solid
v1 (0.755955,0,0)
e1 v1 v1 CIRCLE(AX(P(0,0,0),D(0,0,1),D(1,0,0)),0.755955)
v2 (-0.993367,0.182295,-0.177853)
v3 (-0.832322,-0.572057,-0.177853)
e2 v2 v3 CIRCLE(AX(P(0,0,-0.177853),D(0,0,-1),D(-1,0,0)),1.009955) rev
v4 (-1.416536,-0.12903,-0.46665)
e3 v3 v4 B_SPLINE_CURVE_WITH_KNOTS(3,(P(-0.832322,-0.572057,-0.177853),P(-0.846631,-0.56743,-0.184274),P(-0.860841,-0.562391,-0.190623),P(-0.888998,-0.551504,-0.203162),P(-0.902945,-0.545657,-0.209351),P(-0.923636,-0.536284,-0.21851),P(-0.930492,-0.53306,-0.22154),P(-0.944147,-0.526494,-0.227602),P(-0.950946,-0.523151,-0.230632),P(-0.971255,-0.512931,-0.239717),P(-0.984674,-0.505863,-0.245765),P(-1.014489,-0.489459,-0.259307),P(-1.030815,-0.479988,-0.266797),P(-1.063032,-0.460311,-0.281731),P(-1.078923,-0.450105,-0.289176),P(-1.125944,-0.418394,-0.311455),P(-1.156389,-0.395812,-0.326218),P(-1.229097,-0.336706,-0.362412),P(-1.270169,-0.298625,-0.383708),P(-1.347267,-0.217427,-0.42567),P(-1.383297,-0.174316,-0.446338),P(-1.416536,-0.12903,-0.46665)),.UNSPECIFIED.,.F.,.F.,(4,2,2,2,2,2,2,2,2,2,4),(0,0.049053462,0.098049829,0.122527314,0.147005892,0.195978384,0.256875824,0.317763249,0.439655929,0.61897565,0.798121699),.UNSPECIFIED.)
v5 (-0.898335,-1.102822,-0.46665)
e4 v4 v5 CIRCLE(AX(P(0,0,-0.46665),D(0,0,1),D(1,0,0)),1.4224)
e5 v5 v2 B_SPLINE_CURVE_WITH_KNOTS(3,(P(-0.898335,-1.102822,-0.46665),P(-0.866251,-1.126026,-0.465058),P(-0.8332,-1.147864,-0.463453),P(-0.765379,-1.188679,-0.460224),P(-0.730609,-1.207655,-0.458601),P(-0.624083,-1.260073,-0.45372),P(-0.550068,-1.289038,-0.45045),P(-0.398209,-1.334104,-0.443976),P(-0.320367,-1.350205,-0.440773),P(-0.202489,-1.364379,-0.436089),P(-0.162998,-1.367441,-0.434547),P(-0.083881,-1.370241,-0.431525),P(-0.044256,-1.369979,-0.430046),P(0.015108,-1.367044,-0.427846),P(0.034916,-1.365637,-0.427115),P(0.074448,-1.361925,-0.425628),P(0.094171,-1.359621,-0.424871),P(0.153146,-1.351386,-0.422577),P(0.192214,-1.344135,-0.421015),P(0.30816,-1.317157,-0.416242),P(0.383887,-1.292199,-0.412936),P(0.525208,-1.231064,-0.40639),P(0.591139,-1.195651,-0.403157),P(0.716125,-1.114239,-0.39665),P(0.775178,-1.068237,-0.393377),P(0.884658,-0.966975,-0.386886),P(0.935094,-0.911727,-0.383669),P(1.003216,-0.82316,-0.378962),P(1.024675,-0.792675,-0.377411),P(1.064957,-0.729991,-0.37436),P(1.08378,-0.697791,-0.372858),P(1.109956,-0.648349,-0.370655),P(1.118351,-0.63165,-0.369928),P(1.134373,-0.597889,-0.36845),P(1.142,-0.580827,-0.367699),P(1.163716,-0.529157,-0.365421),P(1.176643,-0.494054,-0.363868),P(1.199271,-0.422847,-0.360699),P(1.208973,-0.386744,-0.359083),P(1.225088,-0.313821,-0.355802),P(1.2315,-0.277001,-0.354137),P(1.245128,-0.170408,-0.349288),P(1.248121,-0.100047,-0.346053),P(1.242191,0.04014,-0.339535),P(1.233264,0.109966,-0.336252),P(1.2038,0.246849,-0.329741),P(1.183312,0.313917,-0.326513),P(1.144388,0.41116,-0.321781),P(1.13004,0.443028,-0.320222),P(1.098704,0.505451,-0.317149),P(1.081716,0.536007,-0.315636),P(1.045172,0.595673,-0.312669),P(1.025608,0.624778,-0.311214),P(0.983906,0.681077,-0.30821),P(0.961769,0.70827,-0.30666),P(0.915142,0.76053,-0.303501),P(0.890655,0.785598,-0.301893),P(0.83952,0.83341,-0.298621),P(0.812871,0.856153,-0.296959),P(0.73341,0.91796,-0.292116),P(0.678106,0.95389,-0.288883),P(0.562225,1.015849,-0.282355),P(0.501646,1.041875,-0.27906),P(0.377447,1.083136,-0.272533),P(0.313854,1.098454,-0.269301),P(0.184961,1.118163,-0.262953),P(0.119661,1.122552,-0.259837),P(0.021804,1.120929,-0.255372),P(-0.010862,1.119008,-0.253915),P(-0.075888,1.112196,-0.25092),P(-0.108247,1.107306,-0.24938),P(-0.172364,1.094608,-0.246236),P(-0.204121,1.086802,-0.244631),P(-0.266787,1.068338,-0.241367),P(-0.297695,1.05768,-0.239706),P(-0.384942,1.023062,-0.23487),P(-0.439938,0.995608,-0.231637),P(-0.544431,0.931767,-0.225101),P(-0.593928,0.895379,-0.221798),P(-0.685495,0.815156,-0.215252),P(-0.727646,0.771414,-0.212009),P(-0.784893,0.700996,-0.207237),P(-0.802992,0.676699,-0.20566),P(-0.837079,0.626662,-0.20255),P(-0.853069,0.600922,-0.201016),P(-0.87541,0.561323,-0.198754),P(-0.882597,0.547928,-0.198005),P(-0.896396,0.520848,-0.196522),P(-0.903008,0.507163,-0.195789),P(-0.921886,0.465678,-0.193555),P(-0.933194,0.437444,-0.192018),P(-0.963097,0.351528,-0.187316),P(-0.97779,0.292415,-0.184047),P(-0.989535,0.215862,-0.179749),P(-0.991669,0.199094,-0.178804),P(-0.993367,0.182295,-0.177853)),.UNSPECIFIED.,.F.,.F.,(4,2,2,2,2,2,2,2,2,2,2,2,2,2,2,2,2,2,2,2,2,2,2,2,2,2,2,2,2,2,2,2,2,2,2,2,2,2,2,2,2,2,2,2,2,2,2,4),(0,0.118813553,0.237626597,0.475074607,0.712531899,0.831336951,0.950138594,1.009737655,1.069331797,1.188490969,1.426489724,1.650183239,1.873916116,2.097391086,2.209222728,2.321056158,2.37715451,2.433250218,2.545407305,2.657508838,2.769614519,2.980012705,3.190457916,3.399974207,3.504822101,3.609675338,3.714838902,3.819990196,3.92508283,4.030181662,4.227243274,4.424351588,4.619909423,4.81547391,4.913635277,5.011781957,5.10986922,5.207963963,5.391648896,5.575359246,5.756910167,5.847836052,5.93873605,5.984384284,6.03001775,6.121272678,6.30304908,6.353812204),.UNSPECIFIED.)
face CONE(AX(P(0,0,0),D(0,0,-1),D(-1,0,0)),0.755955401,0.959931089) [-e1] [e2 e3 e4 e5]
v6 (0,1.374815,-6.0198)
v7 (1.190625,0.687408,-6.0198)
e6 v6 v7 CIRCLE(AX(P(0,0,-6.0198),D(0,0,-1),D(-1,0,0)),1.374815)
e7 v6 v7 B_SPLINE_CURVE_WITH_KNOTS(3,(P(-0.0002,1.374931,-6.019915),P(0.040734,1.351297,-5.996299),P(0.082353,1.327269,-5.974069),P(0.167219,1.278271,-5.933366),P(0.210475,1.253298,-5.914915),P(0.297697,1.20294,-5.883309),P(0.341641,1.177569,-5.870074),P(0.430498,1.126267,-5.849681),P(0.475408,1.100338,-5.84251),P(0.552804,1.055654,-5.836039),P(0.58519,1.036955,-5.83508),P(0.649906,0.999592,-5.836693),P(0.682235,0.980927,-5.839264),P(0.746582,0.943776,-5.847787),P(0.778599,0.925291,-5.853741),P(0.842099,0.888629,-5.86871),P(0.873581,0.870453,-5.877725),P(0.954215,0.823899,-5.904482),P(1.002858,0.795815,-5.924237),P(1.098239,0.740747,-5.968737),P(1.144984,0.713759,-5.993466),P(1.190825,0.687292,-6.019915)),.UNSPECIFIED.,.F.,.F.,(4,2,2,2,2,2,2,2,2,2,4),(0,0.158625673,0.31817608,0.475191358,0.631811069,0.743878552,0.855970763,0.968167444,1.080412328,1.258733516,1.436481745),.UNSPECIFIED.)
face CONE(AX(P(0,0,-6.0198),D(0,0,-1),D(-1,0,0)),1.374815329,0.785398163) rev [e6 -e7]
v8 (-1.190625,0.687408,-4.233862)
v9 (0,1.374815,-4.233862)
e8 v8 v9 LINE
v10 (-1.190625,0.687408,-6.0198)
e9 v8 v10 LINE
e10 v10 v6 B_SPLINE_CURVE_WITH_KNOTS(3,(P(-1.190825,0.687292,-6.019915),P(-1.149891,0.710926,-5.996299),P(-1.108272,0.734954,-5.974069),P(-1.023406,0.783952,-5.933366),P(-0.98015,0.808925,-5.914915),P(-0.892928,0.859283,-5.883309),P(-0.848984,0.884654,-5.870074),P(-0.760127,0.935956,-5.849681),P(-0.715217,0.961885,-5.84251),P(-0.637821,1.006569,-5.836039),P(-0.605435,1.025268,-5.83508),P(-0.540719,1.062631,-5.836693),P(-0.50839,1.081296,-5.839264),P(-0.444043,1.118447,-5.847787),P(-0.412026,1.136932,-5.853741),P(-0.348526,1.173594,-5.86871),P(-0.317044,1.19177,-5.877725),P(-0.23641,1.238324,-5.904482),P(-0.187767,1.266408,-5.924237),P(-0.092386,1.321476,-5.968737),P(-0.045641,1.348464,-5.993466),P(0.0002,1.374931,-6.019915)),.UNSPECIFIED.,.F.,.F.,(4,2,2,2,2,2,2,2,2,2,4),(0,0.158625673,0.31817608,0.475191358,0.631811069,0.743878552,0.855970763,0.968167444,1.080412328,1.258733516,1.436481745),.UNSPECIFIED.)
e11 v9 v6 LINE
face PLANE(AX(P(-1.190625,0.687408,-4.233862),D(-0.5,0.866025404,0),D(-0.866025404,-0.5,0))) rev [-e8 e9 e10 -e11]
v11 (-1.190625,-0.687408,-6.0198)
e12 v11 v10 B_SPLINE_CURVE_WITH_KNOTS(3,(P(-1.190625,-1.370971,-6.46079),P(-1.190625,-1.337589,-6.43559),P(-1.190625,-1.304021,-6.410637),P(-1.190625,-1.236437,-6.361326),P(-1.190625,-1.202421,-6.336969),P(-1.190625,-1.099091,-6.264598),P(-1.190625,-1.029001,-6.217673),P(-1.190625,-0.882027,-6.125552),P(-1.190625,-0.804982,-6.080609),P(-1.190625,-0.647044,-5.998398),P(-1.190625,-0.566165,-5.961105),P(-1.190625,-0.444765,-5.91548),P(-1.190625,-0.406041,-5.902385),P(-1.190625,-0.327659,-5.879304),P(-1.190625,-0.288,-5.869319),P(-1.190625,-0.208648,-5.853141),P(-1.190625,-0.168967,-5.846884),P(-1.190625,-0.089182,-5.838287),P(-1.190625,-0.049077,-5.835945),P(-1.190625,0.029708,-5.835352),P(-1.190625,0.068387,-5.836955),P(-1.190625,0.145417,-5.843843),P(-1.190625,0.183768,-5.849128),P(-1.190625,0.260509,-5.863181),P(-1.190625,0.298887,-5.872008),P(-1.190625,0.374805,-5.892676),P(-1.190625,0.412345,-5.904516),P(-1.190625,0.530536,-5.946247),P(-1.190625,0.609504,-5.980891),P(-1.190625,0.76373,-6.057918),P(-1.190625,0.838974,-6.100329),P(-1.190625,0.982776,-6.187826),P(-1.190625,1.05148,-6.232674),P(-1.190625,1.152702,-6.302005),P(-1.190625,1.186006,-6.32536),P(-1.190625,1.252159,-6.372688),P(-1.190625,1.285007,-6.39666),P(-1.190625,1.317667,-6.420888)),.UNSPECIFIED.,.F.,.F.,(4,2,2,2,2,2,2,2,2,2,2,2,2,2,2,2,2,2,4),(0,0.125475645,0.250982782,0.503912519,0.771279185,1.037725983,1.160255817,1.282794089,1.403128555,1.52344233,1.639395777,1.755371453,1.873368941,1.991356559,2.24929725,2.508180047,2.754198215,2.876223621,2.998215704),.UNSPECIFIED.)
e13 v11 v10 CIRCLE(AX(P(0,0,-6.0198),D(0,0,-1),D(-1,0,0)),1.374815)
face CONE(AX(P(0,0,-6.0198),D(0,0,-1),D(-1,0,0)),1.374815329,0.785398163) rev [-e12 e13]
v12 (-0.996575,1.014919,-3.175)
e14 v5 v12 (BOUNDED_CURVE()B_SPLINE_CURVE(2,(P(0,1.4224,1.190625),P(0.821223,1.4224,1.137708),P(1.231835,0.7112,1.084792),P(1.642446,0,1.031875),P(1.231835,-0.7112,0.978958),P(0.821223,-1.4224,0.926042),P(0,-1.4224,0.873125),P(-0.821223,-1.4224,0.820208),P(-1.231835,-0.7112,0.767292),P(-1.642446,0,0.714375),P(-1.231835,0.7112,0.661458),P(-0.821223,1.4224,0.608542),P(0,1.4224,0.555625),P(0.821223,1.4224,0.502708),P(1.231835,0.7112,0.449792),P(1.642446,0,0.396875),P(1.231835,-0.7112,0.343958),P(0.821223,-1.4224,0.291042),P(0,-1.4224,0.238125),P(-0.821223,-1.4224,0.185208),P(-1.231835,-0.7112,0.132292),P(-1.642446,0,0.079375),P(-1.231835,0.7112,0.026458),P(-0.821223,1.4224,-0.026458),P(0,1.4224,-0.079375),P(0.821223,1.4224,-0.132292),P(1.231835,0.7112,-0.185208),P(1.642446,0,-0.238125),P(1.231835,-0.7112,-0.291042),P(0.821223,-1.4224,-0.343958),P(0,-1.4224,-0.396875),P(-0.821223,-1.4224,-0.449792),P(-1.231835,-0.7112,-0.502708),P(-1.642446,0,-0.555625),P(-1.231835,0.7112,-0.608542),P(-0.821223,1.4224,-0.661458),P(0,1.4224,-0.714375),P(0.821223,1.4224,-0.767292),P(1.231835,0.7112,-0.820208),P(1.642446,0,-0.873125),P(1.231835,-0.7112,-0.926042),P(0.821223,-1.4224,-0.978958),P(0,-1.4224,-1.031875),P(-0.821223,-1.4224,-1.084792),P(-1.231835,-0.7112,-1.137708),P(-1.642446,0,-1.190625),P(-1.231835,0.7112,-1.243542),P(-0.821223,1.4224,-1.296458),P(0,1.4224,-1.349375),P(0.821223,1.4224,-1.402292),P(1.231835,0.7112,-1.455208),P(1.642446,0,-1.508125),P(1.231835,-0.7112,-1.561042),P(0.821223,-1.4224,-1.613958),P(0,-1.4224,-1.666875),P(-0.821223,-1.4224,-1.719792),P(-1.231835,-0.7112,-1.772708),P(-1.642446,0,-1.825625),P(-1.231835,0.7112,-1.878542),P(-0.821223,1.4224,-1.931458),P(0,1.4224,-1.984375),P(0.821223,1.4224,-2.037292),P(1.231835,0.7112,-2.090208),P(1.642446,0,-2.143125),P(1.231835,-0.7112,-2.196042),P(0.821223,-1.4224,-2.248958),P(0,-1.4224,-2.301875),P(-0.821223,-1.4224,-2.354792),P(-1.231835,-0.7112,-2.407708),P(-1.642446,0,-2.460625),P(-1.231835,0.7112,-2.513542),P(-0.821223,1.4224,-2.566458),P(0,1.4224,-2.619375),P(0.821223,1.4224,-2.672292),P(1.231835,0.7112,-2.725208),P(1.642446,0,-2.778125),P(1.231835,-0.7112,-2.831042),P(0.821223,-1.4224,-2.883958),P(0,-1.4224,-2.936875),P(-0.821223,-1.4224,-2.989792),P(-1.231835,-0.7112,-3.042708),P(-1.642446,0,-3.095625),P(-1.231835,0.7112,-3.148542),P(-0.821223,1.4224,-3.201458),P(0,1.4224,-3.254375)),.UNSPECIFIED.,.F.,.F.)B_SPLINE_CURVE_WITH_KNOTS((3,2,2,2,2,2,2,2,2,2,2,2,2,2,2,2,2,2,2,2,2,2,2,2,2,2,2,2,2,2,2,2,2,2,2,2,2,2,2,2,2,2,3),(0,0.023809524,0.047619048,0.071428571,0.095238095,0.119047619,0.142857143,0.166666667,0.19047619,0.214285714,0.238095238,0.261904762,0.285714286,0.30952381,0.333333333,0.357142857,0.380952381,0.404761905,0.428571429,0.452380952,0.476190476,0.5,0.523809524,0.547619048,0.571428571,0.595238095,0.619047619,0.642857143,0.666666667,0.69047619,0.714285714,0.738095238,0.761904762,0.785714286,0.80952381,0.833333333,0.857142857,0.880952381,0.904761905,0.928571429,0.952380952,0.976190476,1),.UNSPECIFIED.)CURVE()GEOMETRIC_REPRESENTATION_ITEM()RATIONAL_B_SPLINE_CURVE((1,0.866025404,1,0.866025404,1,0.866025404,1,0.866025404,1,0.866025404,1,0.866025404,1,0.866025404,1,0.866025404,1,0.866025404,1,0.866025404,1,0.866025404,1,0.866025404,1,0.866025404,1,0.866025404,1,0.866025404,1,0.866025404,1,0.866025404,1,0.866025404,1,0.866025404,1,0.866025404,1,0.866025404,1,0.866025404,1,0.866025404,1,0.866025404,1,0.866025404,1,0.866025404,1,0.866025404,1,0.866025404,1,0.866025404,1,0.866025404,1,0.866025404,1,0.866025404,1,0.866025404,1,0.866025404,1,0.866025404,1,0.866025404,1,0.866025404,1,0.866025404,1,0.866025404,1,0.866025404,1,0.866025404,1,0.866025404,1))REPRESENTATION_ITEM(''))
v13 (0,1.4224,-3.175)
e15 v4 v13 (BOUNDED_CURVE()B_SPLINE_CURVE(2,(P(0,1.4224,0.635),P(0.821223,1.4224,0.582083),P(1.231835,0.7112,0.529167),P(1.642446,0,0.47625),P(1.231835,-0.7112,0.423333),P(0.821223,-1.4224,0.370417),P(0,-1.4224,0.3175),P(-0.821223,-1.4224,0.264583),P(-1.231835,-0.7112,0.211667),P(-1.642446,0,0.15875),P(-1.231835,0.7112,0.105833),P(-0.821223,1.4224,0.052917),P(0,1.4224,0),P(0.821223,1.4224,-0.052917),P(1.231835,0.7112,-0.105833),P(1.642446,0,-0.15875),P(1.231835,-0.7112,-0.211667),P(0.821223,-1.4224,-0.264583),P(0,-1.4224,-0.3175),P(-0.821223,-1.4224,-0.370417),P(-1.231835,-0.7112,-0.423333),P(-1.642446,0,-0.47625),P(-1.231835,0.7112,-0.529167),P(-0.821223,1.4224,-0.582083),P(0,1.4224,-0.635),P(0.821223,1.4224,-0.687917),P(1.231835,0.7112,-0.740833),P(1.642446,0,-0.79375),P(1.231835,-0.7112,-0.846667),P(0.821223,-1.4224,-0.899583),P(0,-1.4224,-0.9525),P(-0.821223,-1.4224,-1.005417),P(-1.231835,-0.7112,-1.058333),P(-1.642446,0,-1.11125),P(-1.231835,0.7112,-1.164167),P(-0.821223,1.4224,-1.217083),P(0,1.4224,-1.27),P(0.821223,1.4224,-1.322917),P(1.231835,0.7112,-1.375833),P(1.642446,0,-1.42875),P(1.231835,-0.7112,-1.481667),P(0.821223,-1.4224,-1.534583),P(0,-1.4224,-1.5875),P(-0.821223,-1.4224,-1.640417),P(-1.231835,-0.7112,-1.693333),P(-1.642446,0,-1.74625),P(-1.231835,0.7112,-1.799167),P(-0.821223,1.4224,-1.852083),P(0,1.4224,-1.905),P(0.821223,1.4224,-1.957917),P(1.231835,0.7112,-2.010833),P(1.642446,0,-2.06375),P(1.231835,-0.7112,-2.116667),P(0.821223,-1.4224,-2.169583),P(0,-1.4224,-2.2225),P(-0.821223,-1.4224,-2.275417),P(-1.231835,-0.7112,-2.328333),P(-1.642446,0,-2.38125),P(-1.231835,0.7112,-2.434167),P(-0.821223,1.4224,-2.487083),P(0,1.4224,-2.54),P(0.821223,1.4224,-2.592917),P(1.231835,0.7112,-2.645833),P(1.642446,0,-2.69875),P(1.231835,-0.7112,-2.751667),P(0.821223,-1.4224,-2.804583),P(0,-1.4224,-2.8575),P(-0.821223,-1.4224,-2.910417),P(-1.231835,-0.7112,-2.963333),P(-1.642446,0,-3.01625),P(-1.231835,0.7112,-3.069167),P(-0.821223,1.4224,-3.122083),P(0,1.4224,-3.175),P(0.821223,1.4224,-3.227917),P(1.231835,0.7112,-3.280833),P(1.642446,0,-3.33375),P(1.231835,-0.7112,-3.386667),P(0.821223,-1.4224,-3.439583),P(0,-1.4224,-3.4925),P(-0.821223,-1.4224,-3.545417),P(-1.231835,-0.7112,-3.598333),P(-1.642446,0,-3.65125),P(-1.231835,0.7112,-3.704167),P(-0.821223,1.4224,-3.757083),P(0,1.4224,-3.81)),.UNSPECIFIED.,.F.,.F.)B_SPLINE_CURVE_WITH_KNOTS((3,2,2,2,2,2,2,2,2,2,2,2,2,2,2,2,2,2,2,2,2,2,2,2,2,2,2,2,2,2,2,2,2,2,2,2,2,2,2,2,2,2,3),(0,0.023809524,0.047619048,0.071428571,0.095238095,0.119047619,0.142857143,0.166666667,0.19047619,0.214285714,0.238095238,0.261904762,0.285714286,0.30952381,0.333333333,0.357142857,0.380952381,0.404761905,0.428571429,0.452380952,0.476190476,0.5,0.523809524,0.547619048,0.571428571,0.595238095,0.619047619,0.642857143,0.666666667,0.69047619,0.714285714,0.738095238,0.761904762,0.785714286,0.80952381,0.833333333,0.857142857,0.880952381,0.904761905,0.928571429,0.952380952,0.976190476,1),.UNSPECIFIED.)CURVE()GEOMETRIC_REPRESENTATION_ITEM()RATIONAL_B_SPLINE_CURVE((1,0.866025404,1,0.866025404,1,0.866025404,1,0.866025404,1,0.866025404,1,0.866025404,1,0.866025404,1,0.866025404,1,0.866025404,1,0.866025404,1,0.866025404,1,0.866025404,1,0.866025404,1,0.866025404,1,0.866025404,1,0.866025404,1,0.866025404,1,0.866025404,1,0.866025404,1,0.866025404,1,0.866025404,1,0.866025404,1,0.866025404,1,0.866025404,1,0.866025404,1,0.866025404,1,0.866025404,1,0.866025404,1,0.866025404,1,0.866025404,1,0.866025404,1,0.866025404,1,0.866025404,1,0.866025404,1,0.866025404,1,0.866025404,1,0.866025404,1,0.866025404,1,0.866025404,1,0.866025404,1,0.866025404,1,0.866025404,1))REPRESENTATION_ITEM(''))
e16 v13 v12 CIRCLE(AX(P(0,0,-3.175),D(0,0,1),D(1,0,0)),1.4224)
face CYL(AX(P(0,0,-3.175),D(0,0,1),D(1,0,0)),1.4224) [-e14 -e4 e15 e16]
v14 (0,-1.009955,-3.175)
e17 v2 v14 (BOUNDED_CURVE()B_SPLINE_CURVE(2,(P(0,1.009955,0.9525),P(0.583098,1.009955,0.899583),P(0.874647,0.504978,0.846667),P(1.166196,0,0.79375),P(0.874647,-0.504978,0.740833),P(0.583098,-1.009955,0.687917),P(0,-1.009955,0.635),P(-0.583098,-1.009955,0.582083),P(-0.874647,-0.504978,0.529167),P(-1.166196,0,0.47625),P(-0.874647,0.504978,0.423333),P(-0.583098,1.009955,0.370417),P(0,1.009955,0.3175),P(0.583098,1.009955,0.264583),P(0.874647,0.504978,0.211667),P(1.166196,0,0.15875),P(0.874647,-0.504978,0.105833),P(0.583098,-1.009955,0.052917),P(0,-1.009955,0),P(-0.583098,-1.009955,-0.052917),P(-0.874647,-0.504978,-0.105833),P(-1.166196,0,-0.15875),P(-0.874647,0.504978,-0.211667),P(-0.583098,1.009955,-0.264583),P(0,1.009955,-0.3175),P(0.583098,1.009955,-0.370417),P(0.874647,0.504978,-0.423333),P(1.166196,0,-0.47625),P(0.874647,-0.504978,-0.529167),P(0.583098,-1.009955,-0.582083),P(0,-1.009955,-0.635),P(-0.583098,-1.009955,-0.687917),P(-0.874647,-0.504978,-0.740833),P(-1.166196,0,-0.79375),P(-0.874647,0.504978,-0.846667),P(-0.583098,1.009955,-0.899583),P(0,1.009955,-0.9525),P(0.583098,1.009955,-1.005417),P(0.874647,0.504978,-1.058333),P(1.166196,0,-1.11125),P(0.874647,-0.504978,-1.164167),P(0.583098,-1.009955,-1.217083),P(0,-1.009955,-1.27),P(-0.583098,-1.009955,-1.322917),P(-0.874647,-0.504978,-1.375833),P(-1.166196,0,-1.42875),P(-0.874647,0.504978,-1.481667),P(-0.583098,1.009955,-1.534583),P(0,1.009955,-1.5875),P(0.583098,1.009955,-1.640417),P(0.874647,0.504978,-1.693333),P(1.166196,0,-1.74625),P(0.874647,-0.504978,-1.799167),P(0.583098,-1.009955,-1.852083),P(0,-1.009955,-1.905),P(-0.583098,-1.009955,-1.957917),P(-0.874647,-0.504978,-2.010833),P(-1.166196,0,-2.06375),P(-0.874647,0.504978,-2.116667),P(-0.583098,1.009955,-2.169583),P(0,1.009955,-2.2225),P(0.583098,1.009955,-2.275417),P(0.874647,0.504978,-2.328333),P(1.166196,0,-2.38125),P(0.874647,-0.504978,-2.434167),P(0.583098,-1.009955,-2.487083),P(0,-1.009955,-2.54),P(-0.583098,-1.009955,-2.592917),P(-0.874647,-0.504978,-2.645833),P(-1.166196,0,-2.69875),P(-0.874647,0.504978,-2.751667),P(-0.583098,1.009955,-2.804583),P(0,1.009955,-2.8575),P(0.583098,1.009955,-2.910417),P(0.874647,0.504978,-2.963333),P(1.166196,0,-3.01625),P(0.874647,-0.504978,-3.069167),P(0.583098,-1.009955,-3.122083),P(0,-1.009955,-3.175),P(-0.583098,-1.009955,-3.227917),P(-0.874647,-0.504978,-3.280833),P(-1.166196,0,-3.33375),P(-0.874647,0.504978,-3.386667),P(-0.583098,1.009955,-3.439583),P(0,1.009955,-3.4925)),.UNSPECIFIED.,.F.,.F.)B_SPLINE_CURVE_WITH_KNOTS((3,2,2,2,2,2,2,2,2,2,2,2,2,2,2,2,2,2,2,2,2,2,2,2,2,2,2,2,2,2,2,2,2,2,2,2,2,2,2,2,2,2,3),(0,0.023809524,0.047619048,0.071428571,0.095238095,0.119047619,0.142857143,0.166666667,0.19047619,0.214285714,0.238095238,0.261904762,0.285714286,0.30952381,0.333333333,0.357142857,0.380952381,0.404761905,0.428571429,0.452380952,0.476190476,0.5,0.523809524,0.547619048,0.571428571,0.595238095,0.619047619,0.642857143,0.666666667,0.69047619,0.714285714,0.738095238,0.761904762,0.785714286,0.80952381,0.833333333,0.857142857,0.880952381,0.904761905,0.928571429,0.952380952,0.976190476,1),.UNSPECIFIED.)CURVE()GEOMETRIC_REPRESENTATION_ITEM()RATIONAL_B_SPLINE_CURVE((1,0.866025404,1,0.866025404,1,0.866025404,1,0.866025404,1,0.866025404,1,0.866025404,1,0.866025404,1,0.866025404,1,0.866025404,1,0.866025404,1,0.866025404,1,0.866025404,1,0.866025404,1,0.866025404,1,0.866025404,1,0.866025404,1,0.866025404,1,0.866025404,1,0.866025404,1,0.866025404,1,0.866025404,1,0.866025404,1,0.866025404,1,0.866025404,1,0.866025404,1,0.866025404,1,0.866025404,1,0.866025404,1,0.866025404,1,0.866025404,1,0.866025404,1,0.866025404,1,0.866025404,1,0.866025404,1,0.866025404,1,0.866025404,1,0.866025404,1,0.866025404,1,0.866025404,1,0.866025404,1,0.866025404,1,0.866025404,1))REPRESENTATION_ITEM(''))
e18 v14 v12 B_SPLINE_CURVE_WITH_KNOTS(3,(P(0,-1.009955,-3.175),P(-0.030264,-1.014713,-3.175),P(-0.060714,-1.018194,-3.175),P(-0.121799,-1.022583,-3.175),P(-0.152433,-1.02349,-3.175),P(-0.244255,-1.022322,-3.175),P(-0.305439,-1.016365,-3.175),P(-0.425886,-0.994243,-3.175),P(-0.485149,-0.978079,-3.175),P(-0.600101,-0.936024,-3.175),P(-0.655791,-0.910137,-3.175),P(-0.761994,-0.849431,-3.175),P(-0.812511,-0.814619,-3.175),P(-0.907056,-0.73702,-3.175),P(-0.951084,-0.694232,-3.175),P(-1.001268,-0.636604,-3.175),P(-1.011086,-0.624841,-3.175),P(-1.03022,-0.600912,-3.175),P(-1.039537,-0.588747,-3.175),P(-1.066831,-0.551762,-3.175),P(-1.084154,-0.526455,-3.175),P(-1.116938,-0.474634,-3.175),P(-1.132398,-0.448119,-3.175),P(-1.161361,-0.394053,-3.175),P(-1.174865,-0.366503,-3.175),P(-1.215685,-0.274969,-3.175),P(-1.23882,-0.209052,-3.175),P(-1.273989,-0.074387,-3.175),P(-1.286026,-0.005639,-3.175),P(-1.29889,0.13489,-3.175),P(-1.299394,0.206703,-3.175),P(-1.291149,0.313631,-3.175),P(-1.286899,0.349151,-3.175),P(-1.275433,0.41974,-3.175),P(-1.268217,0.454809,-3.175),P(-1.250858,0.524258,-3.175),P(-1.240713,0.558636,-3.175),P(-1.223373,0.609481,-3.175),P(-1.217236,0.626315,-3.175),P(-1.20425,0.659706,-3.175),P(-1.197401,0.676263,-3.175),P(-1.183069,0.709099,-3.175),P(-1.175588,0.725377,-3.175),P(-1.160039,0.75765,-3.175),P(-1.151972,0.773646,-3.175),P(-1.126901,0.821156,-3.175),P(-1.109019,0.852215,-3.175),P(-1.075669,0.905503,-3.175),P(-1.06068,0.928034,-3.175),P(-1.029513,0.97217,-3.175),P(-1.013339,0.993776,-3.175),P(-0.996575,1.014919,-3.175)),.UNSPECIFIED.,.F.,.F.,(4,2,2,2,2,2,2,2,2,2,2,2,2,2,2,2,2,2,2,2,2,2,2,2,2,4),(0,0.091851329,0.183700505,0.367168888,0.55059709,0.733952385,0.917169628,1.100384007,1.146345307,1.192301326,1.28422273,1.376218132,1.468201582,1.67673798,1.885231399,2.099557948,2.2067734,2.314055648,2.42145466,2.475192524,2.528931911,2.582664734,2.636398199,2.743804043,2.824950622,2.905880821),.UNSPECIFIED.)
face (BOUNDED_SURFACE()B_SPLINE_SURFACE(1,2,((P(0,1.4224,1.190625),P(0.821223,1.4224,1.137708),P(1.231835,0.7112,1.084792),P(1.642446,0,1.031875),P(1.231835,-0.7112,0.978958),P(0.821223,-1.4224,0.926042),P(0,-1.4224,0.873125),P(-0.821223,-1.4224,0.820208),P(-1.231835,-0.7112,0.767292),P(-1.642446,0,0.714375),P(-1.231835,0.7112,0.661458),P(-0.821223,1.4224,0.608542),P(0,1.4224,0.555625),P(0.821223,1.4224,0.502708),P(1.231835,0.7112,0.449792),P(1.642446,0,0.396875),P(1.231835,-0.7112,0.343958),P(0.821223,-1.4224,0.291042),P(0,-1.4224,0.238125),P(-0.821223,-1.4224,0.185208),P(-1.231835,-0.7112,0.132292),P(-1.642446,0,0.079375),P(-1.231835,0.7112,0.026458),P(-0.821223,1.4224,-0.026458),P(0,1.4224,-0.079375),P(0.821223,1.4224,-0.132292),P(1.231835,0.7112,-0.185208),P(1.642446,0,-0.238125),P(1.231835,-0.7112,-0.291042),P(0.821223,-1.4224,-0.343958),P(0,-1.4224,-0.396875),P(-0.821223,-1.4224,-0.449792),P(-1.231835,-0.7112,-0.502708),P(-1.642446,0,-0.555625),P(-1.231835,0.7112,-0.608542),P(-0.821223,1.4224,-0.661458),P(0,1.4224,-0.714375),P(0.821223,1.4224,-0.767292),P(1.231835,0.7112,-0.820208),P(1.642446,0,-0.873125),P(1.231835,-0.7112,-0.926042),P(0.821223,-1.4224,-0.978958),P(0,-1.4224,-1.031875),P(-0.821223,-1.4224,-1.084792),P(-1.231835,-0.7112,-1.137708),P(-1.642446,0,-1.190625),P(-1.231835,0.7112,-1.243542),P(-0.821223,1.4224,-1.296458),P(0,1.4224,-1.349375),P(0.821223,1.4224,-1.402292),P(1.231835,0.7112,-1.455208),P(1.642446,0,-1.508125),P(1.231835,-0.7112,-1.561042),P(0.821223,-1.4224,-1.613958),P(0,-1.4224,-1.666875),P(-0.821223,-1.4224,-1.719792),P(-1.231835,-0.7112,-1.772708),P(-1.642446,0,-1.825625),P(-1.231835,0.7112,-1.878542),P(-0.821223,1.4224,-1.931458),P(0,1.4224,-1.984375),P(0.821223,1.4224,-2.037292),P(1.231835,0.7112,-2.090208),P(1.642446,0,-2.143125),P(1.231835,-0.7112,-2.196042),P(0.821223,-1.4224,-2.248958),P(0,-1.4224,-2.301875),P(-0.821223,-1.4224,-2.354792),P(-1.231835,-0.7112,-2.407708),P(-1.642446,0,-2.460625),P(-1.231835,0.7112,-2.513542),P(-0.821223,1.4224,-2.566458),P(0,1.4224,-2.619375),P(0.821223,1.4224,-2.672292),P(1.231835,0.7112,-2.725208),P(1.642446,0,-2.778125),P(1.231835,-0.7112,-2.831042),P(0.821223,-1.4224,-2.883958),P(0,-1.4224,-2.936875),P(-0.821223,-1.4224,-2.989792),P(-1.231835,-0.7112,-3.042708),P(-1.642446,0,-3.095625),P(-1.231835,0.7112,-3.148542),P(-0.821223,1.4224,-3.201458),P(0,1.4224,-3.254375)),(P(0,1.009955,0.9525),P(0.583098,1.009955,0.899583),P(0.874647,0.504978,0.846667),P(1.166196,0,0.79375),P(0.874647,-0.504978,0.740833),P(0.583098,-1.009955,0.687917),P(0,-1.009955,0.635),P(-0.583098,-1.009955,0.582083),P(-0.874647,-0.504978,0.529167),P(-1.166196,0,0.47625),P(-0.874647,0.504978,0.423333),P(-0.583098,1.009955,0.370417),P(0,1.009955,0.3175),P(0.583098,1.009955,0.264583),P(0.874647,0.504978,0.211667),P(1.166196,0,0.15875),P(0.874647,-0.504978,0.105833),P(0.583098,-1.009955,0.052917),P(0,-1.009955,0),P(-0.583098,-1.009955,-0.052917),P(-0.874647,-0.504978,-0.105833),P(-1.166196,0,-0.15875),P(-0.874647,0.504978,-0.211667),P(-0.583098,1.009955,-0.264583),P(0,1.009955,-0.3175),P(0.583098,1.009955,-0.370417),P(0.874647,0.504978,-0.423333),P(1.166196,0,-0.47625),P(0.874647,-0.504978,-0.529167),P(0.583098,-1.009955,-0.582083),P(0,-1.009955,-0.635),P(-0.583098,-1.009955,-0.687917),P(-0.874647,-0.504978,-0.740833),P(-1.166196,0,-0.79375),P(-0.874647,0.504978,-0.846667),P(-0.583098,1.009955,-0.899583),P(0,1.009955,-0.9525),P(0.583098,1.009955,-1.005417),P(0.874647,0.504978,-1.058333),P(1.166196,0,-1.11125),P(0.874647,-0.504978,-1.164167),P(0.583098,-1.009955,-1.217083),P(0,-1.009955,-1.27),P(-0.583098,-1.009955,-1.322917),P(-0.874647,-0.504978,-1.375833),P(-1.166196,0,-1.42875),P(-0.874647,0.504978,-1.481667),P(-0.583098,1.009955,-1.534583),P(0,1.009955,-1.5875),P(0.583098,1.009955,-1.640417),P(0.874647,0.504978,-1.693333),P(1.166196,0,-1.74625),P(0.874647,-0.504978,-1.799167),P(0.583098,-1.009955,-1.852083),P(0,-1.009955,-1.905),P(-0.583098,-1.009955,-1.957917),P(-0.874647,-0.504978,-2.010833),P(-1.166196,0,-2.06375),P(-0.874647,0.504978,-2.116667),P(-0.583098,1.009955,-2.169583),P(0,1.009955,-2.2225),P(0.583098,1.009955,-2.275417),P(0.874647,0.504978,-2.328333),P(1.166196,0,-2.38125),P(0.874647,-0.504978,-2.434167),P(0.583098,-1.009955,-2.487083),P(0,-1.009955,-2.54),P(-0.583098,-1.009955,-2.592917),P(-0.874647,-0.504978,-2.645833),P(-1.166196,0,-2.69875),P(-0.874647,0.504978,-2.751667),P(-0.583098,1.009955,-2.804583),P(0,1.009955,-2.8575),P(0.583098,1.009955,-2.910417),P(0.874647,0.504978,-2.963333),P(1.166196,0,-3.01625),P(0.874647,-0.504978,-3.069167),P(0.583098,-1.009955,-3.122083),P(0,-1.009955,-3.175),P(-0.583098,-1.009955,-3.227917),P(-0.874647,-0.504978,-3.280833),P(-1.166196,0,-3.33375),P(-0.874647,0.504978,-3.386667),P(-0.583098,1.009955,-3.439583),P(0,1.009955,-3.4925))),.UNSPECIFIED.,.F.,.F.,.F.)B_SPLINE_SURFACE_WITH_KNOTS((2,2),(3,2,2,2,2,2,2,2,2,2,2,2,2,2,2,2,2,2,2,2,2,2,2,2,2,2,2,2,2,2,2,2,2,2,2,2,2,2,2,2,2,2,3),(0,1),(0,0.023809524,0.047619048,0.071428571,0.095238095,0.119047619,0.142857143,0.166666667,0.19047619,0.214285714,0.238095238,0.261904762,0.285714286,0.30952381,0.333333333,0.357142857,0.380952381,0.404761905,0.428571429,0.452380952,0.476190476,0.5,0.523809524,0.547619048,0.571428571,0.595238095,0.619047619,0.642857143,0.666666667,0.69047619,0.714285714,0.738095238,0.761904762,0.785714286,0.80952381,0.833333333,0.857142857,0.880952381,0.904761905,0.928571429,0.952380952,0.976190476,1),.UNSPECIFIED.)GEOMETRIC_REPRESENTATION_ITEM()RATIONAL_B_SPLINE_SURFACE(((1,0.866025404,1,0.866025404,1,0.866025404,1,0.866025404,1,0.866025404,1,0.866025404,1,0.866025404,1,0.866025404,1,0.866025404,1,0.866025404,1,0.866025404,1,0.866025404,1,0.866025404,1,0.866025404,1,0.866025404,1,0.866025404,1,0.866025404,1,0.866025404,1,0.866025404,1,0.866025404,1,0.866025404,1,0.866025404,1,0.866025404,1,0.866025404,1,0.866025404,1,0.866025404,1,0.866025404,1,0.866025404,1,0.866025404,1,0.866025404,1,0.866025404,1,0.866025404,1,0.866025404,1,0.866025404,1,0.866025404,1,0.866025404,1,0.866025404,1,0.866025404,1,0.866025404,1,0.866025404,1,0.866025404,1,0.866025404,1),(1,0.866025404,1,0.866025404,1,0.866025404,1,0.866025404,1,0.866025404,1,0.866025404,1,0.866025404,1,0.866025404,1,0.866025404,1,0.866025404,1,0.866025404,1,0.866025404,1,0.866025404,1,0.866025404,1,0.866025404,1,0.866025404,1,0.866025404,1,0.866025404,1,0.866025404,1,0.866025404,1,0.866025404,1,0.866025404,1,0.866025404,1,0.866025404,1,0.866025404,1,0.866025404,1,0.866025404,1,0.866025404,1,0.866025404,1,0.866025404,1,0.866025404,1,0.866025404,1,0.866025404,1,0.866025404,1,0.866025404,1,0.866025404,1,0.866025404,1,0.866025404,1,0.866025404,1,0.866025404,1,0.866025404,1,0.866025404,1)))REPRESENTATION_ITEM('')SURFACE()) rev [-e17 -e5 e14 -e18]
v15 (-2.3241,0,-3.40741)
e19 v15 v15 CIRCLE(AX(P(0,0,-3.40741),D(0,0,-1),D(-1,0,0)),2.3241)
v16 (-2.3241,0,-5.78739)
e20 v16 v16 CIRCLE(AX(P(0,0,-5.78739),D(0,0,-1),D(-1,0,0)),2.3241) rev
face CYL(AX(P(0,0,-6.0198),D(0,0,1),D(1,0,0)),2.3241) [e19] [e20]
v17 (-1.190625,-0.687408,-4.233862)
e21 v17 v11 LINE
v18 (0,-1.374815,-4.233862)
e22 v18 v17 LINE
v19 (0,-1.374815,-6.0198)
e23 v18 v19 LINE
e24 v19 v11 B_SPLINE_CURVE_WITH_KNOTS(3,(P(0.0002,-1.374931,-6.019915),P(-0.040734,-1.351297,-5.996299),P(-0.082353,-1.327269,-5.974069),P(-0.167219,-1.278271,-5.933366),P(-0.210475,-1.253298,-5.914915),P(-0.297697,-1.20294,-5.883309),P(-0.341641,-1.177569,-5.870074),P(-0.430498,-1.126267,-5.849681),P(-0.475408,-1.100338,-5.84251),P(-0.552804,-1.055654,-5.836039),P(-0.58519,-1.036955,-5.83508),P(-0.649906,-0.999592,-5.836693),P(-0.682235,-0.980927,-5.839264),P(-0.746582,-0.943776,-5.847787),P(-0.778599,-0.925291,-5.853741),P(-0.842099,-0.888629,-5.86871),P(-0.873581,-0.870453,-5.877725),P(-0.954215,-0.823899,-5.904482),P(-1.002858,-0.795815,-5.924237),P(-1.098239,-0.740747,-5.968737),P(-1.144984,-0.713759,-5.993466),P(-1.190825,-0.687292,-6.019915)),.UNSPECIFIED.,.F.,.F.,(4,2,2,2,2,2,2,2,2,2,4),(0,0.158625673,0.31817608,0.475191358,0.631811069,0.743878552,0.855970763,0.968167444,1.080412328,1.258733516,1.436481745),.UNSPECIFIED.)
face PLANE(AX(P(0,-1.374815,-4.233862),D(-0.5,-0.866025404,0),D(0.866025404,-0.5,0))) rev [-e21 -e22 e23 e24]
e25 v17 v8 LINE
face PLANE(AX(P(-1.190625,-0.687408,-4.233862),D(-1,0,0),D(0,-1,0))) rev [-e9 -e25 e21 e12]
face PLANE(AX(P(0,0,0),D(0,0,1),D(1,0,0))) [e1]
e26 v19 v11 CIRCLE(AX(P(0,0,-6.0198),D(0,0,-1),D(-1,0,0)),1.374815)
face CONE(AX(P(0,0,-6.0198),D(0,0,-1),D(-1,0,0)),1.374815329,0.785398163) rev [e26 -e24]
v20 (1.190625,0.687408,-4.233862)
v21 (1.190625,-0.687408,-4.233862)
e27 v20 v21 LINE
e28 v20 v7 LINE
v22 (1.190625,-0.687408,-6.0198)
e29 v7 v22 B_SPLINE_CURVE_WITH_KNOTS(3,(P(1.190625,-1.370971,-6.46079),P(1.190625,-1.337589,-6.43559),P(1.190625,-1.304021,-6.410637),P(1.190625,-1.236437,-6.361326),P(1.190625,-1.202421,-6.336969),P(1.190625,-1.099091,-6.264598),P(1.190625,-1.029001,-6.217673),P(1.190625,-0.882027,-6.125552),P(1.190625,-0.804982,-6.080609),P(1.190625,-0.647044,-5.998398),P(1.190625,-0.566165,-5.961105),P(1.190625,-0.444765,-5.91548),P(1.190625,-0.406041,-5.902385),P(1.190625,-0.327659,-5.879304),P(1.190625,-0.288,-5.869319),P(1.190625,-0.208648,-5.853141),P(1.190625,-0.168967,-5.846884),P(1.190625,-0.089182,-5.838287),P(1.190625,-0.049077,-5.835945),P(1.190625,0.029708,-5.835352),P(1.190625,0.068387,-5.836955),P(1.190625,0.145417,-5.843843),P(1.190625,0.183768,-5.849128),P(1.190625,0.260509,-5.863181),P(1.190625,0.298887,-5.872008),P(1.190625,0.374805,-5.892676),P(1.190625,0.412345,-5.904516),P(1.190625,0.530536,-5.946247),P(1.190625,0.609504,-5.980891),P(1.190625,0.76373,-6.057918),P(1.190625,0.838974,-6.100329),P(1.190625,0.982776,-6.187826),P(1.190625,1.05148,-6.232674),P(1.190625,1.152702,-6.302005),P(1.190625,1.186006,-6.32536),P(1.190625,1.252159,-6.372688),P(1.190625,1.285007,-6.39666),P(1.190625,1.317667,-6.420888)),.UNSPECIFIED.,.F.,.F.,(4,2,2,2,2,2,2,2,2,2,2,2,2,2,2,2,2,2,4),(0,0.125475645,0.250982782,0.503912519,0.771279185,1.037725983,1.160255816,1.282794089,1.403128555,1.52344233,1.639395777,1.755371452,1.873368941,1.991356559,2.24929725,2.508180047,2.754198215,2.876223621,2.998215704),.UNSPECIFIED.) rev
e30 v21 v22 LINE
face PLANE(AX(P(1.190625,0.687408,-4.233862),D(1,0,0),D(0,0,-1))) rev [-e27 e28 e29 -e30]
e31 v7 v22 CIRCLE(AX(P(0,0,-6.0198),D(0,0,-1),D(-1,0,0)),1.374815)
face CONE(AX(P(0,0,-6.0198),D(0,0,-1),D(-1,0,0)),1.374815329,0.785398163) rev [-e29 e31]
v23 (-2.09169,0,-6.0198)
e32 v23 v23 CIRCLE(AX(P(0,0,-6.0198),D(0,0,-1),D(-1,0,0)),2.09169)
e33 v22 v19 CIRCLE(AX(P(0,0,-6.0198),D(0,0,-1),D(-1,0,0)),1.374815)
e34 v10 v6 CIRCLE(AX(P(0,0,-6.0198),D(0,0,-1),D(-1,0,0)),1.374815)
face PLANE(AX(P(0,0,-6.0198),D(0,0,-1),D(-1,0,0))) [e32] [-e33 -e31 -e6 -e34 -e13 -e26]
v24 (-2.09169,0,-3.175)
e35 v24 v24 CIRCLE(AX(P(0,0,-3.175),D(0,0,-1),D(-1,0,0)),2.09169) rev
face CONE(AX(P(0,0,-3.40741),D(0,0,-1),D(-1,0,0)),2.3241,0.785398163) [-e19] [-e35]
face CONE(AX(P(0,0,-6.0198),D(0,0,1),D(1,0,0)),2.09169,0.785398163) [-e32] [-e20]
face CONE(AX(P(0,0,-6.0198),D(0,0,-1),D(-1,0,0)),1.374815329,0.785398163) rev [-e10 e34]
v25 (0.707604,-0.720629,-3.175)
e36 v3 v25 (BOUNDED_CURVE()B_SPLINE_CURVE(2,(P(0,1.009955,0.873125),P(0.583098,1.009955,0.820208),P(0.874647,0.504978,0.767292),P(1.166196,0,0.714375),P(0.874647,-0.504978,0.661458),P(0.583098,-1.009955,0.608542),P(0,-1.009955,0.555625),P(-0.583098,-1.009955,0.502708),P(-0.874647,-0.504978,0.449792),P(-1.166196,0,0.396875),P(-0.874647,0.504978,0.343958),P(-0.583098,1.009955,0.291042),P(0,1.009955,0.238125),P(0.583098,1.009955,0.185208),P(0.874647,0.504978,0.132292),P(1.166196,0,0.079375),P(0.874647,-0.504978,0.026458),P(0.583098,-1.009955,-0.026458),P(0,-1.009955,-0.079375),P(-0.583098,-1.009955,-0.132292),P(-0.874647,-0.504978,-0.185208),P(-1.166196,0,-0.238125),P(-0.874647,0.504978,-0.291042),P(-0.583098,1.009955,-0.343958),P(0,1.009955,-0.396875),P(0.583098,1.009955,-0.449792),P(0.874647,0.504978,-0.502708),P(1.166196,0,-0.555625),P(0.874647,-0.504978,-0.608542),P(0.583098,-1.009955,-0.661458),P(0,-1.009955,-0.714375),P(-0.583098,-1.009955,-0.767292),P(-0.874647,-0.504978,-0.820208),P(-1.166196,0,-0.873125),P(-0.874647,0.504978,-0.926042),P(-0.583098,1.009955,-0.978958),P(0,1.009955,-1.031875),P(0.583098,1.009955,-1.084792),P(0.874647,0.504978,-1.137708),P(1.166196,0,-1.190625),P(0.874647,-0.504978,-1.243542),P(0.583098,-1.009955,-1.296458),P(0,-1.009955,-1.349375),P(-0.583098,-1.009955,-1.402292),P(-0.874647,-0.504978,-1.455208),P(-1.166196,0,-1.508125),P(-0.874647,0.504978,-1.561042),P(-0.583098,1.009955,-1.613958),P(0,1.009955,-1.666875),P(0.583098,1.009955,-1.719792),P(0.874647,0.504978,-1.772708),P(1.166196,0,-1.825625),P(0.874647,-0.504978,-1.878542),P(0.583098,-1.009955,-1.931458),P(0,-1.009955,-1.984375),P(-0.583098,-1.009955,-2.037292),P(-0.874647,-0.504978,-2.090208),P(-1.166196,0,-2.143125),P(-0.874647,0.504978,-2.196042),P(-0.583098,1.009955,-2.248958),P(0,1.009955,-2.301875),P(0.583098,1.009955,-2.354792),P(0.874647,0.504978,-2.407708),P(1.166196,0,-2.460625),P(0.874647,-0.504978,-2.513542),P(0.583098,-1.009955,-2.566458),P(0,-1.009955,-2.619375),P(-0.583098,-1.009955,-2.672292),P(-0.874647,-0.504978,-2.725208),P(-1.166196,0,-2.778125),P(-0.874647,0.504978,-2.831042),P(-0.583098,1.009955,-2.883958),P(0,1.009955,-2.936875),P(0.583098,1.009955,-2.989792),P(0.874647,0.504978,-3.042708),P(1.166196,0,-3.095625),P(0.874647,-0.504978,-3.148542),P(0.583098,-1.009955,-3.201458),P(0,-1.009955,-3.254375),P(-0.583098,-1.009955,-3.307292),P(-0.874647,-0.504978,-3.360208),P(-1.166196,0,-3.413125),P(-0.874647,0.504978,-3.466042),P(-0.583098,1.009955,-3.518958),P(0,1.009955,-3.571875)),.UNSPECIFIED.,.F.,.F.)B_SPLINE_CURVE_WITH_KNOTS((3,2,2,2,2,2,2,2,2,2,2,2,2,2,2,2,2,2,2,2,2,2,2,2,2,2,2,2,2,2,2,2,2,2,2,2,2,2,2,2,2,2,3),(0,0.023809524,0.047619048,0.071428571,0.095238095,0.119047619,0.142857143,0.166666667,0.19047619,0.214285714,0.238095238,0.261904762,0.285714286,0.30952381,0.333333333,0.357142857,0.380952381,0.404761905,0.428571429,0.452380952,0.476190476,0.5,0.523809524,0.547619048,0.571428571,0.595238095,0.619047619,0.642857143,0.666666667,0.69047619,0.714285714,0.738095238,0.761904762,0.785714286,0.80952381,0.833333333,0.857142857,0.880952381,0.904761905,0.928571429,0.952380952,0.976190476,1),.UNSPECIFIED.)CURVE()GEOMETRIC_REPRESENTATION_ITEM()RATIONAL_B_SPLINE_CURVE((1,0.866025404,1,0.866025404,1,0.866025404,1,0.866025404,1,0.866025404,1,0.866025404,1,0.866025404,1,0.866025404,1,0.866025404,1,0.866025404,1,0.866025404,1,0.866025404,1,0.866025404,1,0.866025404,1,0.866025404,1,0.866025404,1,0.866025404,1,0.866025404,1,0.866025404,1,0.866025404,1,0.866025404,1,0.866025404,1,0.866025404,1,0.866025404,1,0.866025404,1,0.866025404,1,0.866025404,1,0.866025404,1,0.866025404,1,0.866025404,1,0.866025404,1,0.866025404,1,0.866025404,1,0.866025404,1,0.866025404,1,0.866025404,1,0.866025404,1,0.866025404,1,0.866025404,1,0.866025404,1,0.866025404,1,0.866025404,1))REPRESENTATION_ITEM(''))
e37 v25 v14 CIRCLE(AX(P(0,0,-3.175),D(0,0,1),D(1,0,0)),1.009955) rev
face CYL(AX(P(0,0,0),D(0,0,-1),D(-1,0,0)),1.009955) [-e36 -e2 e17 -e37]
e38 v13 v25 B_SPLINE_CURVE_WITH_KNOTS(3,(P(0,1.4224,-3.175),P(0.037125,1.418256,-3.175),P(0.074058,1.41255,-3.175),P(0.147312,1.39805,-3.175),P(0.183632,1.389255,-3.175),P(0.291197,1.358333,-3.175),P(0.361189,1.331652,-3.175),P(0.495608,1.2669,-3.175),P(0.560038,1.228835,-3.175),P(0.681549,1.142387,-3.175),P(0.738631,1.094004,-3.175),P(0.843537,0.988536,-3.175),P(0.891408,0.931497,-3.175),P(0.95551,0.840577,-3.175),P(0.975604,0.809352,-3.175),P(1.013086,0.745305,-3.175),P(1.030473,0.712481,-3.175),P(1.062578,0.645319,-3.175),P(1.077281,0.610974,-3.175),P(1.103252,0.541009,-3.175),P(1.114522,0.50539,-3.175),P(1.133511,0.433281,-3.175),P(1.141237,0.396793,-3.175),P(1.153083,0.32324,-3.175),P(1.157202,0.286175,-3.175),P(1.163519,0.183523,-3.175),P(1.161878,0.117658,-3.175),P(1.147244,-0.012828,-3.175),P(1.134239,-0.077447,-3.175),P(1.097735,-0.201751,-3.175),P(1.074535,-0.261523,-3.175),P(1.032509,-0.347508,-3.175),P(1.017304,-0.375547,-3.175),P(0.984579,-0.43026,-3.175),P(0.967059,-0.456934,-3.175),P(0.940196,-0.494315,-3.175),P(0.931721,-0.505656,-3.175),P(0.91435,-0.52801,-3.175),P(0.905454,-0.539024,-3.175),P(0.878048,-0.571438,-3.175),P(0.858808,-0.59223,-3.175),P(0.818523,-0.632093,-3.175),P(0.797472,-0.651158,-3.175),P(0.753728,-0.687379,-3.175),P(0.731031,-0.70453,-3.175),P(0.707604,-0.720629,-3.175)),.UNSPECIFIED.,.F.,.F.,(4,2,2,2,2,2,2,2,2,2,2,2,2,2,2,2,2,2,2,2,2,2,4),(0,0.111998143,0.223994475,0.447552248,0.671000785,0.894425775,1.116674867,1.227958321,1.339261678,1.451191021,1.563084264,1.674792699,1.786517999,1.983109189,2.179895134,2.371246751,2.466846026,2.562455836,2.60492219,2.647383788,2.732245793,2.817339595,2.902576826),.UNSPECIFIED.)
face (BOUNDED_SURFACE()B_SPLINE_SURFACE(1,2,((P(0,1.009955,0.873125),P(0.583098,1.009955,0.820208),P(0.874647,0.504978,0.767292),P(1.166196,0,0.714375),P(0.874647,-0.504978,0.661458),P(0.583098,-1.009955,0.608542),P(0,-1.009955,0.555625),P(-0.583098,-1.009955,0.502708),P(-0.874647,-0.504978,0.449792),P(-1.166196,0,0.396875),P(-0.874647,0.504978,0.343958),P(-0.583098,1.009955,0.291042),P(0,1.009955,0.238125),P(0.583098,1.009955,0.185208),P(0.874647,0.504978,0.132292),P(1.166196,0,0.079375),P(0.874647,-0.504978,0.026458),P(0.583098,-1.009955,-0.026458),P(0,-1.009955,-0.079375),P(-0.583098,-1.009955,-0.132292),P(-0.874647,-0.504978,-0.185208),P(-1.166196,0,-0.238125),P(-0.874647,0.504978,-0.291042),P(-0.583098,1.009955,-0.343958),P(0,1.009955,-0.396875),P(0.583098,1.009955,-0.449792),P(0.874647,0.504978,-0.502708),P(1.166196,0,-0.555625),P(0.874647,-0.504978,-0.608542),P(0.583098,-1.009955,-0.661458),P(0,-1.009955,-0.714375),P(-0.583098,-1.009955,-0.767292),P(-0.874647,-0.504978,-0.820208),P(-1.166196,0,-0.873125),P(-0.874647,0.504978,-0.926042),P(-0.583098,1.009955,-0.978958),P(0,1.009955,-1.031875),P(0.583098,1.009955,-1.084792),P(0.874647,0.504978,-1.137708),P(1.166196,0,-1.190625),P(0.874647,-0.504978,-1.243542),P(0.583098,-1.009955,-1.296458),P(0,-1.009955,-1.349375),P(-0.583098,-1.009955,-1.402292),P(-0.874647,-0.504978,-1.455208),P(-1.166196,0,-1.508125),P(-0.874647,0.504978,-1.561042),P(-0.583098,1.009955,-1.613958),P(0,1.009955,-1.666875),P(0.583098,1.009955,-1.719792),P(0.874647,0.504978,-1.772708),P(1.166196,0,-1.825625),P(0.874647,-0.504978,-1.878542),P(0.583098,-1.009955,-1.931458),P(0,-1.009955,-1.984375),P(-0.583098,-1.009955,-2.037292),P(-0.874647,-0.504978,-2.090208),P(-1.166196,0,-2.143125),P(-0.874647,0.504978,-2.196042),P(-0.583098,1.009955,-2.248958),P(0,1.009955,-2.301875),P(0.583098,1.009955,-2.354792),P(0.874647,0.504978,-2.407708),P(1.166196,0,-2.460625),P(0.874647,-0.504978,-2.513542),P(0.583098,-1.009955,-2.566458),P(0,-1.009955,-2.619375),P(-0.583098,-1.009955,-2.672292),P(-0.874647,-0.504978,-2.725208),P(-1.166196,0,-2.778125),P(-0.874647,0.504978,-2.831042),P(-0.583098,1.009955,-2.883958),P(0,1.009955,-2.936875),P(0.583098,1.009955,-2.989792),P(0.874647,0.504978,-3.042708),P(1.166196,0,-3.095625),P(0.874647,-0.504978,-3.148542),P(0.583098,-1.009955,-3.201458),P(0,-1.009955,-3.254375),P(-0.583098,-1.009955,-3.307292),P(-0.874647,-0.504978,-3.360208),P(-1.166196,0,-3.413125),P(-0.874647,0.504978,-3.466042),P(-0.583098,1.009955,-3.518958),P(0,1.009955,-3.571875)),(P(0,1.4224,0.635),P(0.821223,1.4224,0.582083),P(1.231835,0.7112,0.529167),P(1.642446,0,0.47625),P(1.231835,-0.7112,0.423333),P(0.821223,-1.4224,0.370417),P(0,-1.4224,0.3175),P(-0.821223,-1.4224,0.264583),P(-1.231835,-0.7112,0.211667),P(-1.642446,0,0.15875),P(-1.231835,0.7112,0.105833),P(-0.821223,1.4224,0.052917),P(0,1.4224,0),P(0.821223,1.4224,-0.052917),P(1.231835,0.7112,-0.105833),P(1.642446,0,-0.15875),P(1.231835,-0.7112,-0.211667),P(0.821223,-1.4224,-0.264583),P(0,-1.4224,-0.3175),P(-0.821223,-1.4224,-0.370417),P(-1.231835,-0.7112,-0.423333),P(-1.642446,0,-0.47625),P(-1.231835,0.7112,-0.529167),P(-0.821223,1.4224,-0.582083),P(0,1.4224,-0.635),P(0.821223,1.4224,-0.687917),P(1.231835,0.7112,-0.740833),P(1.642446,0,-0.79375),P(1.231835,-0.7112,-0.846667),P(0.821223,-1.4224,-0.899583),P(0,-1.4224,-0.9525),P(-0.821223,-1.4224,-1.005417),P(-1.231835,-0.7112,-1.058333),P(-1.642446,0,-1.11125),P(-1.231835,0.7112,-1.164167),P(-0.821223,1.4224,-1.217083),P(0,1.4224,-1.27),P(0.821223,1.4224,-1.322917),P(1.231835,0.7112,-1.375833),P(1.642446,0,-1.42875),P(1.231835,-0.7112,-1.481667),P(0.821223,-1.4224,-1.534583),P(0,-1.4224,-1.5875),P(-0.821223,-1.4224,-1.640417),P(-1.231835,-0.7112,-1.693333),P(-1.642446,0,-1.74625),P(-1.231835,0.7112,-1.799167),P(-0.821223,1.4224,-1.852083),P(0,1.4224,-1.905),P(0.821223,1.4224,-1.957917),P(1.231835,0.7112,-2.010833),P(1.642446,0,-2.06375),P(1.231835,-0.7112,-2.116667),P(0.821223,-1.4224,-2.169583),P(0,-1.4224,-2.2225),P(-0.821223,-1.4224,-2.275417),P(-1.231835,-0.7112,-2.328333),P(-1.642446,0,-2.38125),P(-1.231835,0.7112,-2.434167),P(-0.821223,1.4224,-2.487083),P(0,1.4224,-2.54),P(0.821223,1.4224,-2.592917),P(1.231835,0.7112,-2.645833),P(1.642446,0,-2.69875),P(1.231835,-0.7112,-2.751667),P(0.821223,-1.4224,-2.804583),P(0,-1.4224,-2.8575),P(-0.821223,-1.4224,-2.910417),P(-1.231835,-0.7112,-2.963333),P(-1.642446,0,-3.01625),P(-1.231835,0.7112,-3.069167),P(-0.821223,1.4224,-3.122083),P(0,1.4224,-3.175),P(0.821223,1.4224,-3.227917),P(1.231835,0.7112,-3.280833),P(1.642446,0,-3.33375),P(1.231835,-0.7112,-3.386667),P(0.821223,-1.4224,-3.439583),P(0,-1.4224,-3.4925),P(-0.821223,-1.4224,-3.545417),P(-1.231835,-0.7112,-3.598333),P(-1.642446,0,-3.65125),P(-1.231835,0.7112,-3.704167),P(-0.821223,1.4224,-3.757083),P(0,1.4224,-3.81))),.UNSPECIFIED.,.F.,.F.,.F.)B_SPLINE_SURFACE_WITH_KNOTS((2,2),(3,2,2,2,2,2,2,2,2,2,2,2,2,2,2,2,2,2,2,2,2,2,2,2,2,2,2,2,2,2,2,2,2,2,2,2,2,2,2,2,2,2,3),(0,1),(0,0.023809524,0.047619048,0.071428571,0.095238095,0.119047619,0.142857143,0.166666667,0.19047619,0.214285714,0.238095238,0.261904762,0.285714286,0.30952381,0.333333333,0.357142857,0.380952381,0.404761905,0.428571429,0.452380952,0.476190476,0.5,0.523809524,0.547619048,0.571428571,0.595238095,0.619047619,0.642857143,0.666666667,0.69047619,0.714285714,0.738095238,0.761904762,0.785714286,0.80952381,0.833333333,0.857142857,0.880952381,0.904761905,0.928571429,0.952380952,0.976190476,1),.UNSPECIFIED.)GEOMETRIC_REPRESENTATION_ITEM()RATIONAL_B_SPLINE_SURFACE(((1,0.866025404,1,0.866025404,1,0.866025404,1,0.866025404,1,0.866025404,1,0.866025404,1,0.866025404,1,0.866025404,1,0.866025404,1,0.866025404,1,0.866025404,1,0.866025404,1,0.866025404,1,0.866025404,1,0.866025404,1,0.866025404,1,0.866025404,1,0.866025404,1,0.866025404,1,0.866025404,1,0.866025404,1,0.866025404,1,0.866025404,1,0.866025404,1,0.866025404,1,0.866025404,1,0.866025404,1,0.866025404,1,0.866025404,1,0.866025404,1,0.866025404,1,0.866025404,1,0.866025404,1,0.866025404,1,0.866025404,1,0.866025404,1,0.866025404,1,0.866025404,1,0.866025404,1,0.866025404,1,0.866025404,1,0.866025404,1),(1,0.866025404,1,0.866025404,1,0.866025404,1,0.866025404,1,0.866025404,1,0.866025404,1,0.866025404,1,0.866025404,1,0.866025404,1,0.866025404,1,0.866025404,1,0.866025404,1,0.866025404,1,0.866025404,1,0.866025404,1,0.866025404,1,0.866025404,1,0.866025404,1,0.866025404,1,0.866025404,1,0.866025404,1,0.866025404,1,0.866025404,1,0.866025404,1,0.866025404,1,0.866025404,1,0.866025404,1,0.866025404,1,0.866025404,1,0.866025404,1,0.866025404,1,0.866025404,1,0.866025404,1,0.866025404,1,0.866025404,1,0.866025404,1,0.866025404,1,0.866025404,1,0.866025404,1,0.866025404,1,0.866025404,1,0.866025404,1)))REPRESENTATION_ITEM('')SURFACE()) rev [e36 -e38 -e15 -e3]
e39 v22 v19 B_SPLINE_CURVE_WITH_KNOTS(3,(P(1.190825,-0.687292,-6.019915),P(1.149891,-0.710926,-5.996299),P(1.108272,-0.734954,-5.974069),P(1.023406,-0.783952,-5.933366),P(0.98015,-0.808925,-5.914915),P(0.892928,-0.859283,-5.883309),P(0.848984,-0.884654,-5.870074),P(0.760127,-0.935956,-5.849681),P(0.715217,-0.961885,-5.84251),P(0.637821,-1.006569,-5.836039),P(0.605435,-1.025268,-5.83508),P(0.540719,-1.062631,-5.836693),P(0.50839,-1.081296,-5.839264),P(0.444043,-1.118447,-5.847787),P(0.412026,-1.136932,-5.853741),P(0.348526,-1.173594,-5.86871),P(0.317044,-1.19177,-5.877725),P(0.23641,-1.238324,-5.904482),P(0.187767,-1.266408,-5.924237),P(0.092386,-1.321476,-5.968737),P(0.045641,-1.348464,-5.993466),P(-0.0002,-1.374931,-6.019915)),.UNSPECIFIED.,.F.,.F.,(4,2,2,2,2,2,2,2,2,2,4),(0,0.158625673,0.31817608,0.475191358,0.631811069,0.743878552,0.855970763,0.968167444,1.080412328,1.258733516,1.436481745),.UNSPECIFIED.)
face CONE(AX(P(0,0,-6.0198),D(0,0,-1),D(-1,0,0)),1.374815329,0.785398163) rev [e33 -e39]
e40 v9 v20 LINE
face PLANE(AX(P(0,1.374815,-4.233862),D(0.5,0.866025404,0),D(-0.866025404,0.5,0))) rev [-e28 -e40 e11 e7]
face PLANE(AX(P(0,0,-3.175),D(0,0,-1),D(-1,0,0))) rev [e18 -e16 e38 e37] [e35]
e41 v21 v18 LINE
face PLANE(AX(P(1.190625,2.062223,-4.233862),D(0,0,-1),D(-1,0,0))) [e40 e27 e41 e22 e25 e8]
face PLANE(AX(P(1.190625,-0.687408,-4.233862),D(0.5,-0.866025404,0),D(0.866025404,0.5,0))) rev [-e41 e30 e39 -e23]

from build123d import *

# Parameters (mm, degrees)
SKETCH1_R          = 1.4224
EXTRUDE1_DEPTH     = 3.175
CUT_SWEEP1_PITCH   = 0.635
SKETCH6_R          = 2.3241
EXTRUDE2_DEPTH     = 2.8448
CUT_EXTRUDE1_DEPTH = 1.7859375
CHAMFER1_SIZE      = 0.23241


with BuildPart() as part:
    # Sketch1 → Extrude1 (new body)
    with BuildSketch(Plane.XY):
        Circle(SKETCH1_R)
    extrude(amount=-EXTRUDE1_DEPTH)

    # Cut-Sweep1: the profile of Sketch3 profile screwed along a right-hand helix of 6 turns, 6 arcs to a turn; built about Z, then put on its axis
    cut_sweep1_z = Axis((0, 0, 0), (0, 0, 1))
    cut_sweep1_corners = [(1.4227, 0, -0.555798205), (1.009955401, 0, -0.3175), (1.009955401, 0, -0.238125), (1.4227, 0, 0.000173205)]
    with BuildLine(mode=Mode.PRIVATE) as cut_sweep1_profile:
        Line(cut_sweep1_corners[0], cut_sweep1_corners[1])
        Line(cut_sweep1_corners[1], cut_sweep1_corners[2])
        Line(cut_sweep1_corners[2], cut_sweep1_corners[3])
        Line(cut_sweep1_corners[3], cut_sweep1_corners[0])
    cut_sweep1_cap = Face(cut_sweep1_profile.wire())
    cut_sweep1_turn_angles = [0, 30, 60, 90, 120, 150, 180, 210, 240, 270, 300, 330, 360]
    cut_sweep1_turn_weights = [1, 0.8660254037844387, 1, 0.8660254037844387, 1, 0.8660254037844387, 1, 0.8660254037844387, 1, 0.8660254037844387, 1, 0.8660254037844387, 1]
    cut_sweep1_turn_rails = [Edge.make_bspline([Vector(p[0], p[1], 0).rotate(cut_sweep1_z, cut_sweep1_turn_angles[k]) / cut_sweep1_turn_weights[k] + Vector(0, 0, p[2] + CUT_SWEEP1_PITCH * cut_sweep1_turn_angles[k] / 360) for k in range(13)], [0, 0, 0, 1, 1, 2, 2, 3, 3, 4, 4, 5, 5, 6, 6, 6], 2, cut_sweep1_turn_weights) for p in cut_sweep1_corners]
    cut_sweep1_turn_sides = [Face.make_surface_from_curves(cut_sweep1_turn_rails[p[0]], cut_sweep1_turn_rails[p[1]]) for p in [(0, 1), (1, 2), (2, 3), (3, 0)]]
    cut_sweep1 = Plane(origin=(0, 0, 0), x_dir=(0, 1, 0), z_dir=(0, 0, -1)) * Solid(Shell([*[p.moved(Location((0, 0, CUT_SWEEP1_PITCH * i))) for i in range(6) for p in cut_sweep1_turn_sides], cut_sweep1_cap, cut_sweep1_cap.rotate(cut_sweep1_z, 2160).moved(Location((0, 0, CUT_SWEEP1_PITCH * 2160 / 360)))]))
    add(cut_sweep1, mode=Mode.SUBTRACT)

    # Sketch4 → Cut-Revolve1 (revolve, cut)
    with BuildSketch(Plane(origin=(0, 0, 0), x_dir=(0, 0, -1), z_dir=(1, 0, 0)), mode=Mode.PRIVATE) as cut_revolve1_sk:
        Polygon((0.466649532, 1.4224), (0, 0.755955401), (0, 1.4224), align=None)
    revolve(cut_revolve1_sk.sketch.rotate(Axis((0, 0, 0), (0, 0, -1)), 264.795368264), axis=Axis((0, 0, 0), (0, 0, -1)), mode=Mode.SUBTRACT)

    # Sketch6 → Extrude2 (add)
    with BuildSketch(Plane(origin=(0, 0, -3.175), x_dir=(-1, 0, 0), z_dir=(0, 0, -1))):
        Circle(SKETCH6_R)
    extrude(amount=EXTRUDE2_DEPTH)

    # Sketch7 → Cut-Extrude1 (cut)
    with BuildSketch(Plane(origin=(0, 0, -6.0198), x_dir=(-1, 0, 0), z_dir=(0, 0, -1))):
        Polygon((0, 1.374815329), (-1.190625, 0.687407664), (-1.190625, -0.687407664), (0, -1.374815329), (1.190625, -0.687407664), (1.190625, 0.687407664), align=None)
    extrude(amount=-CUT_EXTRUDE1_DEPTH, mode=Mode.SUBTRACT)

    # Cut-Extrude2 cone 1 section (through the dimple's axis) → Cut-Extrude2 (revolve, cut)
    with BuildSketch(Plane(origin=(0, 0, -6.0198), x_dir=(0, 1, 0), z_dir=(1, 0, 0))):
        Polygon((0, 0), (1.374815329, 0), (0, 1.374815329), align=None)
    revolve(axis=Axis((0, 0, -6.0198), (0, 0, 1)), mode=Mode.SUBTRACT)

    # Chamfer1
    chamfer1_edges = [part.edges().sort_by_distance(p)[0] for p in [
        (2.3241, 0, -3.175),
        (2.3241, 0, -6.0198),
    ]]
    chamfer(chamfer1_edges, length=CHAMFER1_SIZE)


solid = part.part
